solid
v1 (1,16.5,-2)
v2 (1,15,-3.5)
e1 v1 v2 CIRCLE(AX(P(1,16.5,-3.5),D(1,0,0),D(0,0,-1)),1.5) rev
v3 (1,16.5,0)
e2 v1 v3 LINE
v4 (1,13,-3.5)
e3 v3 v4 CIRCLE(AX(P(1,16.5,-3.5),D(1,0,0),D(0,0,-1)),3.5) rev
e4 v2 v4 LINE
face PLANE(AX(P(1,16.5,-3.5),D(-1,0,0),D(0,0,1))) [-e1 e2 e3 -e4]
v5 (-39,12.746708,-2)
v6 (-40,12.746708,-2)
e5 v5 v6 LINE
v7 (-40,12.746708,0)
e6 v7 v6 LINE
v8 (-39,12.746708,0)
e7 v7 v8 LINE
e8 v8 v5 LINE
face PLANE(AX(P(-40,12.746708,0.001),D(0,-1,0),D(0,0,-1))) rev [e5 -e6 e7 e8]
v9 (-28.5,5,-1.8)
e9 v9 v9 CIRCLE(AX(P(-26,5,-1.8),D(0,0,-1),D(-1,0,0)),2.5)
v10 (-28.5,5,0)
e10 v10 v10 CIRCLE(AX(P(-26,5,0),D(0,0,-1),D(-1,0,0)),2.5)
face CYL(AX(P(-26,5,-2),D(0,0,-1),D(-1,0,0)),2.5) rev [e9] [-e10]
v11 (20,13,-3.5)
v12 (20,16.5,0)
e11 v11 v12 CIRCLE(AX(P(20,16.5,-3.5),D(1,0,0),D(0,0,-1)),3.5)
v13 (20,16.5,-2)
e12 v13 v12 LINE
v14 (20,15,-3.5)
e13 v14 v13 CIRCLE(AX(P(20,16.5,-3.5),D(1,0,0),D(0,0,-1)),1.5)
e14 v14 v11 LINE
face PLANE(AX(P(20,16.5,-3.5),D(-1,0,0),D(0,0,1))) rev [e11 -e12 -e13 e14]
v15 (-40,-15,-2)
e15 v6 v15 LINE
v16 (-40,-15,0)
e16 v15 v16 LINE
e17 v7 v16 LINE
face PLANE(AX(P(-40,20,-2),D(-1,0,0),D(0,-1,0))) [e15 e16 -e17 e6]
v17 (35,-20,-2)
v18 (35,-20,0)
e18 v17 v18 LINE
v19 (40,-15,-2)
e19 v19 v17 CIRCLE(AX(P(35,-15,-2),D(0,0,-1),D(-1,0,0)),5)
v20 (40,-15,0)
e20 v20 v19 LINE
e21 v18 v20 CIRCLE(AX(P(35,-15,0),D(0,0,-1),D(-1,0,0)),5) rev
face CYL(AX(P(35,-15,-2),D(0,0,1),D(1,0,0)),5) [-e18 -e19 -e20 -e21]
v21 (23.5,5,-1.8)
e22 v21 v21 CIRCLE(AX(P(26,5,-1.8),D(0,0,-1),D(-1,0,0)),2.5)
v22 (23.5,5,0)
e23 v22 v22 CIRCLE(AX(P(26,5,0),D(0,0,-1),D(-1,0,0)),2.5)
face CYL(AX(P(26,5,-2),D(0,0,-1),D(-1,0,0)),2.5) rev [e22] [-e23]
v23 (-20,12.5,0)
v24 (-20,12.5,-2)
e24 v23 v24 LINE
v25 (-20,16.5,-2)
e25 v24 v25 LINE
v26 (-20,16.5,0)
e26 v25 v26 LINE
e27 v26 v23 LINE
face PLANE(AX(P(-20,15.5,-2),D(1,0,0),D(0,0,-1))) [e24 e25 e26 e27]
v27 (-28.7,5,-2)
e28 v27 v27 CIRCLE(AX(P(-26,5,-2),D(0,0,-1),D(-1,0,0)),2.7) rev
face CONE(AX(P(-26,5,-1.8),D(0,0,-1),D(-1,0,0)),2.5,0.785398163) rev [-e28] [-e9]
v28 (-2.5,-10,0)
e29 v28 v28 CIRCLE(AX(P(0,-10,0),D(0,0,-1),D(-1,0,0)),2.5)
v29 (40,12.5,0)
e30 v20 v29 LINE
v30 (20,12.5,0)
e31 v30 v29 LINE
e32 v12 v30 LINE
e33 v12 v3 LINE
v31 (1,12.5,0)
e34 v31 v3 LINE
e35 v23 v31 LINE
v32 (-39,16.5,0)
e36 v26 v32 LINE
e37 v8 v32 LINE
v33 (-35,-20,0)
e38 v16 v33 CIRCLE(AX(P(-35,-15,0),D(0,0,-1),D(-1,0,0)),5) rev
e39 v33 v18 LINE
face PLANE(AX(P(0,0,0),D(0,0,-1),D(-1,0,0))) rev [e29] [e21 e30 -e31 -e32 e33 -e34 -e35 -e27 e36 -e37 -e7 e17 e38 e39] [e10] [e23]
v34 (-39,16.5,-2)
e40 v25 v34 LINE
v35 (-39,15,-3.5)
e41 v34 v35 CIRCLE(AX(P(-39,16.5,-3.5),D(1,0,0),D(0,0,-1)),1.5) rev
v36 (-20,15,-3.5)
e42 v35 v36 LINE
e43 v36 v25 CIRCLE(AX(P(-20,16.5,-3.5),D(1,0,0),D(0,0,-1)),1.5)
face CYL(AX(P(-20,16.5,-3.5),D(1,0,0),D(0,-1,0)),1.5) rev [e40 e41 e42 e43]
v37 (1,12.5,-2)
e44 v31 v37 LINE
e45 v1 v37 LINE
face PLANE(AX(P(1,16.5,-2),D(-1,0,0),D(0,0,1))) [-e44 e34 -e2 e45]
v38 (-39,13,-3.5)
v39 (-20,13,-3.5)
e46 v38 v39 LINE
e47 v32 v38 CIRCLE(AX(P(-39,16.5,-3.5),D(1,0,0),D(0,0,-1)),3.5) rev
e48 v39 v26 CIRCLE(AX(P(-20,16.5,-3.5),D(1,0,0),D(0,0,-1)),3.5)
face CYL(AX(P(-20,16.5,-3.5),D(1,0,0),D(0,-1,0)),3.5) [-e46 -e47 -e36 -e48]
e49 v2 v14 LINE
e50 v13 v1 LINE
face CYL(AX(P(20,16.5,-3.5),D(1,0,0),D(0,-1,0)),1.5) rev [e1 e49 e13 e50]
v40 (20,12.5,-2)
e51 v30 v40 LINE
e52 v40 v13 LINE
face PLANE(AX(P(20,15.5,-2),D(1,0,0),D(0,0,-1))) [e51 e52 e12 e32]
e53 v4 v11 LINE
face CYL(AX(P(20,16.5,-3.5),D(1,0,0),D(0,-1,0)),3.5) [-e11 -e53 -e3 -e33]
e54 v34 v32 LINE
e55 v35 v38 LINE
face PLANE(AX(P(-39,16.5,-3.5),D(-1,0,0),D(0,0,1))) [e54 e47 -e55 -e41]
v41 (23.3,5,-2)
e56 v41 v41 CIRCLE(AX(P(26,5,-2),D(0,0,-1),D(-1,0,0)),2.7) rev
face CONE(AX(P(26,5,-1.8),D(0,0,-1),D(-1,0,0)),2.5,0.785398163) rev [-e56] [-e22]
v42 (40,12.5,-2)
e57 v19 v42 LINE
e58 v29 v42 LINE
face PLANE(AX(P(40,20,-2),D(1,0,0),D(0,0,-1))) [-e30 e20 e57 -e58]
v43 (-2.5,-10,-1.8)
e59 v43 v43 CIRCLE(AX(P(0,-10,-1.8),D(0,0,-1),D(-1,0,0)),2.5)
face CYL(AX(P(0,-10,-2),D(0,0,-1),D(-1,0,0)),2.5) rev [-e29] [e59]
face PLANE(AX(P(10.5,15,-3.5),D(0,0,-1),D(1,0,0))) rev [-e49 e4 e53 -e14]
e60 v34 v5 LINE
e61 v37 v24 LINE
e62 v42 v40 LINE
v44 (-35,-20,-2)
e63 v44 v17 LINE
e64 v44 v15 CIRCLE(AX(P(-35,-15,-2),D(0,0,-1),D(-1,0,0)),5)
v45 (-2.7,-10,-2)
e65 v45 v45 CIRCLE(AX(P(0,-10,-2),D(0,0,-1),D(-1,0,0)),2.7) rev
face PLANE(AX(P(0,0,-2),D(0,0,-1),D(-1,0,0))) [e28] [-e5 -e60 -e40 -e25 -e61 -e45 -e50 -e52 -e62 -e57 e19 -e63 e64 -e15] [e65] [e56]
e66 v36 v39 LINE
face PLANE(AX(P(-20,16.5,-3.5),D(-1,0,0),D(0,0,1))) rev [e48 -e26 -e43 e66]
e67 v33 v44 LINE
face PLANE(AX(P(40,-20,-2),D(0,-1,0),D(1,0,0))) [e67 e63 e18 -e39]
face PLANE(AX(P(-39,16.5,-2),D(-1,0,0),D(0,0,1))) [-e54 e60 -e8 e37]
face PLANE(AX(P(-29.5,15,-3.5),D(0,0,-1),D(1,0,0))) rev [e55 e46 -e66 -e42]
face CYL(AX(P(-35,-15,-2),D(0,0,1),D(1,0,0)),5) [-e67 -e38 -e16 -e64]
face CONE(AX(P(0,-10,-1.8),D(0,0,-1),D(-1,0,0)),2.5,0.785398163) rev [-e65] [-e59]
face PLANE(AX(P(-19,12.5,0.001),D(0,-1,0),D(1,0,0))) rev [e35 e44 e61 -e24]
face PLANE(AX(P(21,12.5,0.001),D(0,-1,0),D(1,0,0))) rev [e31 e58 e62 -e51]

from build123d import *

# Parameters (mm, degrees)
SKETCH2_W             = 80
SKETCH2_H             = 40
BASE_FLANGE1_DEPTH    = 2
HEM1_START            = -40
HEM1_DEPTH            = 21
HEM1_2_DEPTH          = 1
HEM1_START_2          = -20
HEM1_3_DEPTH          = 1
HEM1_START_3          = -39
HEM1_4_DEPTH          = 19
HEM3_DEPTH            = 21
HEM3_2_DEPTH          = 1
HEM3_START            = 20
HEM3_3_DEPTH          = 1
HEM3_START_2          = 1
HEM3_4_DEPTH          = 19
CUT_EXTRUDE1_REACH    = 47
SKETCH13_W            = 1
SKETCH13_H            = 2.753292139
FILLET1_R             = 5
F_5_0MM_DOWEL_HOLE1_D = 5
CHAMFER1_SIZE         = 0.2


# Read off the part's stored shape, not the designer's step: Hem1, Hem3
# Sheet-metal steps are written as plain solids
with BuildPart() as part:
    # Sketch2 → Base-Flange1 (new body)
    with BuildSketch(Plane.XY):
        Rectangle(SKETCH2_W, SKETCH2_H)
    extrude(amount=-BASE_FLANGE1_DEPTH)

    # Hem1 outline → Hem1 (cut)
    with BuildSketch(Plane.YZ.offset(HEM1_START)):
        with BuildLine():
            Line((20, 0), (16.5, 0))
            ThreePointArc((16.5, 0), (18.370828693, -0.541960108), (19.66227766, -2))
            Line((19.66227766, -2), (20, -2))
            Line((20, -2), (20, 0))
        make_face()
    extrude(amount=HEM1_DEPTH, mode=Mode.SUBTRACT)

    # Hem1 2 outline → Hem1 2 (cut)
    with BuildSketch(Plane.YZ.offset(HEM1_START)):
        with BuildLine():
            Line((15.5, 0), (15.5, -2))
            Line((15.5, -2), (19.66227766, -2))
            ThreePointArc((19.66227766, -2), (18.370828693, -0.541960108), (16.5, 0))
            Line((16.5, 0), (15.5, 0))
        make_face()
    extrude(amount=HEM1_2_DEPTH, mode=Mode.SUBTRACT)

    # Hem1 3 outline → Hem1 3 (cut)
    with BuildSketch(Plane.YZ.offset(HEM1_START_2)):
        with BuildLine():
            Line((15.5, 0), (15.5, -2))
            Line((15.5, -2), (19.66227766, -2))
            ThreePointArc((19.66227766, -2), (18.370828693, -0.541960108), (16.5, 0))
            Line((16.5, 0), (15.5, 0))
        make_face()
    extrude(amount=HEM1_3_DEPTH, mode=Mode.SUBTRACT)

    # Hem1 4 outline → Hem1 4 (add)
    with BuildSketch(Plane.YZ.offset(HEM1_START_3)):
        with BuildLine():
            Line((19.66227766, -2), (16.5, -2))
            ThreePointArc((16.5, -2), (17.560660172, -4.560660172), (15, -3.5))
            Line((15, -3.5), (13, -3.5))
            ThreePointArc((13, -3.5), (17.268774411, -6.914525722), (19.66227766, -2))
        make_face()
    extrude(amount=HEM1_4_DEPTH)

    # Hem3 outline → Hem3 (cut)
    with BuildSketch(Plane.YZ):
        with BuildLine():
            Line((20, 0), (16.5, 0))
            ThreePointArc((16.5, 0), (18.370828693, -0.541960108), (19.66227766, -2))
            Line((19.66227766, -2), (20, -2))
            Line((20, -2), (20, 0))
        make_face()
    extrude(amount=HEM3_DEPTH, mode=Mode.SUBTRACT)

    # Hem3 2 outline → Hem3 2 (cut)
    with BuildSketch(Plane.YZ):
        with BuildLine():
            Line((15.5, 0), (15.5, -2))
            Line((15.5, -2), (19.66227766, -2))
            ThreePointArc((19.66227766, -2), (18.370828693, -0.541960108), (16.5, 0))
            Line((16.5, 0), (15.5, 0))
        make_face()
    extrude(amount=HEM3_2_DEPTH, mode=Mode.SUBTRACT)

    # Hem3 3 outline → Hem3 3 (cut)
    with BuildSketch(Plane.YZ.offset(HEM3_START)):
        with BuildLine():
            Line((15.5, 0), (15.5, -2))
            Line((15.5, -2), (19.66227766, -2))
            ThreePointArc((19.66227766, -2), (18.370828693, -0.541960108), (16.5, 0))
            Line((16.5, 0), (15.5, 0))
        make_face()
    extrude(amount=HEM3_3_DEPTH, mode=Mode.SUBTRACT)

    # Hem3 4 outline → Hem3 4 (add)
    with BuildSketch(Plane.YZ.offset(HEM3_START_2)):
        with BuildLine():
            Line((19.66227766, -2), (16.5, -2))
            ThreePointArc((16.5, -2), (17.560660172, -4.560660172), (15, -3.5))
            Line((15, -3.5), (13, -3.5))
            ThreePointArc((13, -3.5), (17.268774411, -6.914525722), (19.66227766, -2))
        make_face()
    extrude(amount=HEM3_4_DEPTH)

    # Sketch13 → Cut-Extrude1 (cut, up to next)
    with BuildSketch(Plane(origin=(0, 0, -2), x_dir=(-1, 0, 0), z_dir=(0, 0, -1)), mode=Mode.PRIVATE) as cut_extrude1_sk1:
        Polygon((-21, 12.5), (-40, 12.5), (-40, 20), (-21, 20), (-21, 15.5), (-20, 15.5), (-20, 12.5), align=None)
    cut_extrude1_tool1 = extrude(cut_extrude1_sk1.sketch, amount=-CUT_EXTRUDE1_REACH, mode=Mode.PRIVATE) & part.part
    # Sketch13 → Cut-Extrude1 (cut, up to next)
    with BuildSketch(Plane(origin=(0, 0, -2), x_dir=(-1, 0, 0), z_dir=(0, 0, -1)), mode=Mode.PRIVATE) as cut_extrude1_sk2:
        Polygon((19, 12.5), (0, 12.5), (-1, 12.5), (-1, 15.5), (0, 15.5), (0, 20), (19, 20), (19, 15.5), (20, 15.5), (20, 12.5), align=None)
    cut_extrude1_tool2 = extrude(cut_extrude1_sk2.sketch, amount=-CUT_EXTRUDE1_REACH, mode=Mode.PRIVATE) & part.part
    # Sketch13 → Cut-Extrude1 (cut, up to next)
    with BuildSketch(Plane(origin=(0, 0, -2), x_dir=(-1, 0, 0), z_dir=(0, 0, -1)), mode=Mode.PRIVATE) as cut_extrude1_sk3:
        with Locations((39.5, 14.123353931)):
            Rectangle(SKETCH13_W, SKETCH13_H)
    cut_extrude1_tool3 = extrude(cut_extrude1_sk3.sketch, amount=-CUT_EXTRUDE1_REACH, mode=Mode.PRIVATE) & part.part
    add(cut_extrude1_tool1.solids().sort_by_distance((30.293814, 16.203608, -2))[0], mode=Mode.SUBTRACT)
    add(cut_extrude1_tool2.solids().sort_by_distance((-9.5, 16.159091, -2))[0], mode=Mode.SUBTRACT)
    add(cut_extrude1_tool3.solids().sort_by_distance((-39.5, 14.123354, -2))[0], mode=Mode.SUBTRACT)

    # Fillet1
    fillet1_edges = [part.edges().sort_by_distance(p)[0] for p in [
        (40, -20, -1),
        (-40, -20, -1),
    ]]
    fillet(fillet1_edges, radius=FILLET1_R)

    # Ø5.0mm Dowel Hole1 (through all)
    with Locations(Plane(origin=(0, 0, -2), x_dir=(-1, 0, 0), z_dir=(0, 0, -1))):
        with Locations((-26, 5), (26, 5), (0, -10)):
            Hole(F_5_0MM_DOWEL_HOLE1_D / 2)

    # Chamfer1
    chamfer1_edges = [part.edges().sort_by_distance(p)[0] for p in [
        (-2.5, -10, -2),
        (-28.5, 5, -2),
        (23.5, 5, -2),
    ]]
    chamfer(chamfer1_edges, length=CHAMFER1_SIZE)


solid = part.part
